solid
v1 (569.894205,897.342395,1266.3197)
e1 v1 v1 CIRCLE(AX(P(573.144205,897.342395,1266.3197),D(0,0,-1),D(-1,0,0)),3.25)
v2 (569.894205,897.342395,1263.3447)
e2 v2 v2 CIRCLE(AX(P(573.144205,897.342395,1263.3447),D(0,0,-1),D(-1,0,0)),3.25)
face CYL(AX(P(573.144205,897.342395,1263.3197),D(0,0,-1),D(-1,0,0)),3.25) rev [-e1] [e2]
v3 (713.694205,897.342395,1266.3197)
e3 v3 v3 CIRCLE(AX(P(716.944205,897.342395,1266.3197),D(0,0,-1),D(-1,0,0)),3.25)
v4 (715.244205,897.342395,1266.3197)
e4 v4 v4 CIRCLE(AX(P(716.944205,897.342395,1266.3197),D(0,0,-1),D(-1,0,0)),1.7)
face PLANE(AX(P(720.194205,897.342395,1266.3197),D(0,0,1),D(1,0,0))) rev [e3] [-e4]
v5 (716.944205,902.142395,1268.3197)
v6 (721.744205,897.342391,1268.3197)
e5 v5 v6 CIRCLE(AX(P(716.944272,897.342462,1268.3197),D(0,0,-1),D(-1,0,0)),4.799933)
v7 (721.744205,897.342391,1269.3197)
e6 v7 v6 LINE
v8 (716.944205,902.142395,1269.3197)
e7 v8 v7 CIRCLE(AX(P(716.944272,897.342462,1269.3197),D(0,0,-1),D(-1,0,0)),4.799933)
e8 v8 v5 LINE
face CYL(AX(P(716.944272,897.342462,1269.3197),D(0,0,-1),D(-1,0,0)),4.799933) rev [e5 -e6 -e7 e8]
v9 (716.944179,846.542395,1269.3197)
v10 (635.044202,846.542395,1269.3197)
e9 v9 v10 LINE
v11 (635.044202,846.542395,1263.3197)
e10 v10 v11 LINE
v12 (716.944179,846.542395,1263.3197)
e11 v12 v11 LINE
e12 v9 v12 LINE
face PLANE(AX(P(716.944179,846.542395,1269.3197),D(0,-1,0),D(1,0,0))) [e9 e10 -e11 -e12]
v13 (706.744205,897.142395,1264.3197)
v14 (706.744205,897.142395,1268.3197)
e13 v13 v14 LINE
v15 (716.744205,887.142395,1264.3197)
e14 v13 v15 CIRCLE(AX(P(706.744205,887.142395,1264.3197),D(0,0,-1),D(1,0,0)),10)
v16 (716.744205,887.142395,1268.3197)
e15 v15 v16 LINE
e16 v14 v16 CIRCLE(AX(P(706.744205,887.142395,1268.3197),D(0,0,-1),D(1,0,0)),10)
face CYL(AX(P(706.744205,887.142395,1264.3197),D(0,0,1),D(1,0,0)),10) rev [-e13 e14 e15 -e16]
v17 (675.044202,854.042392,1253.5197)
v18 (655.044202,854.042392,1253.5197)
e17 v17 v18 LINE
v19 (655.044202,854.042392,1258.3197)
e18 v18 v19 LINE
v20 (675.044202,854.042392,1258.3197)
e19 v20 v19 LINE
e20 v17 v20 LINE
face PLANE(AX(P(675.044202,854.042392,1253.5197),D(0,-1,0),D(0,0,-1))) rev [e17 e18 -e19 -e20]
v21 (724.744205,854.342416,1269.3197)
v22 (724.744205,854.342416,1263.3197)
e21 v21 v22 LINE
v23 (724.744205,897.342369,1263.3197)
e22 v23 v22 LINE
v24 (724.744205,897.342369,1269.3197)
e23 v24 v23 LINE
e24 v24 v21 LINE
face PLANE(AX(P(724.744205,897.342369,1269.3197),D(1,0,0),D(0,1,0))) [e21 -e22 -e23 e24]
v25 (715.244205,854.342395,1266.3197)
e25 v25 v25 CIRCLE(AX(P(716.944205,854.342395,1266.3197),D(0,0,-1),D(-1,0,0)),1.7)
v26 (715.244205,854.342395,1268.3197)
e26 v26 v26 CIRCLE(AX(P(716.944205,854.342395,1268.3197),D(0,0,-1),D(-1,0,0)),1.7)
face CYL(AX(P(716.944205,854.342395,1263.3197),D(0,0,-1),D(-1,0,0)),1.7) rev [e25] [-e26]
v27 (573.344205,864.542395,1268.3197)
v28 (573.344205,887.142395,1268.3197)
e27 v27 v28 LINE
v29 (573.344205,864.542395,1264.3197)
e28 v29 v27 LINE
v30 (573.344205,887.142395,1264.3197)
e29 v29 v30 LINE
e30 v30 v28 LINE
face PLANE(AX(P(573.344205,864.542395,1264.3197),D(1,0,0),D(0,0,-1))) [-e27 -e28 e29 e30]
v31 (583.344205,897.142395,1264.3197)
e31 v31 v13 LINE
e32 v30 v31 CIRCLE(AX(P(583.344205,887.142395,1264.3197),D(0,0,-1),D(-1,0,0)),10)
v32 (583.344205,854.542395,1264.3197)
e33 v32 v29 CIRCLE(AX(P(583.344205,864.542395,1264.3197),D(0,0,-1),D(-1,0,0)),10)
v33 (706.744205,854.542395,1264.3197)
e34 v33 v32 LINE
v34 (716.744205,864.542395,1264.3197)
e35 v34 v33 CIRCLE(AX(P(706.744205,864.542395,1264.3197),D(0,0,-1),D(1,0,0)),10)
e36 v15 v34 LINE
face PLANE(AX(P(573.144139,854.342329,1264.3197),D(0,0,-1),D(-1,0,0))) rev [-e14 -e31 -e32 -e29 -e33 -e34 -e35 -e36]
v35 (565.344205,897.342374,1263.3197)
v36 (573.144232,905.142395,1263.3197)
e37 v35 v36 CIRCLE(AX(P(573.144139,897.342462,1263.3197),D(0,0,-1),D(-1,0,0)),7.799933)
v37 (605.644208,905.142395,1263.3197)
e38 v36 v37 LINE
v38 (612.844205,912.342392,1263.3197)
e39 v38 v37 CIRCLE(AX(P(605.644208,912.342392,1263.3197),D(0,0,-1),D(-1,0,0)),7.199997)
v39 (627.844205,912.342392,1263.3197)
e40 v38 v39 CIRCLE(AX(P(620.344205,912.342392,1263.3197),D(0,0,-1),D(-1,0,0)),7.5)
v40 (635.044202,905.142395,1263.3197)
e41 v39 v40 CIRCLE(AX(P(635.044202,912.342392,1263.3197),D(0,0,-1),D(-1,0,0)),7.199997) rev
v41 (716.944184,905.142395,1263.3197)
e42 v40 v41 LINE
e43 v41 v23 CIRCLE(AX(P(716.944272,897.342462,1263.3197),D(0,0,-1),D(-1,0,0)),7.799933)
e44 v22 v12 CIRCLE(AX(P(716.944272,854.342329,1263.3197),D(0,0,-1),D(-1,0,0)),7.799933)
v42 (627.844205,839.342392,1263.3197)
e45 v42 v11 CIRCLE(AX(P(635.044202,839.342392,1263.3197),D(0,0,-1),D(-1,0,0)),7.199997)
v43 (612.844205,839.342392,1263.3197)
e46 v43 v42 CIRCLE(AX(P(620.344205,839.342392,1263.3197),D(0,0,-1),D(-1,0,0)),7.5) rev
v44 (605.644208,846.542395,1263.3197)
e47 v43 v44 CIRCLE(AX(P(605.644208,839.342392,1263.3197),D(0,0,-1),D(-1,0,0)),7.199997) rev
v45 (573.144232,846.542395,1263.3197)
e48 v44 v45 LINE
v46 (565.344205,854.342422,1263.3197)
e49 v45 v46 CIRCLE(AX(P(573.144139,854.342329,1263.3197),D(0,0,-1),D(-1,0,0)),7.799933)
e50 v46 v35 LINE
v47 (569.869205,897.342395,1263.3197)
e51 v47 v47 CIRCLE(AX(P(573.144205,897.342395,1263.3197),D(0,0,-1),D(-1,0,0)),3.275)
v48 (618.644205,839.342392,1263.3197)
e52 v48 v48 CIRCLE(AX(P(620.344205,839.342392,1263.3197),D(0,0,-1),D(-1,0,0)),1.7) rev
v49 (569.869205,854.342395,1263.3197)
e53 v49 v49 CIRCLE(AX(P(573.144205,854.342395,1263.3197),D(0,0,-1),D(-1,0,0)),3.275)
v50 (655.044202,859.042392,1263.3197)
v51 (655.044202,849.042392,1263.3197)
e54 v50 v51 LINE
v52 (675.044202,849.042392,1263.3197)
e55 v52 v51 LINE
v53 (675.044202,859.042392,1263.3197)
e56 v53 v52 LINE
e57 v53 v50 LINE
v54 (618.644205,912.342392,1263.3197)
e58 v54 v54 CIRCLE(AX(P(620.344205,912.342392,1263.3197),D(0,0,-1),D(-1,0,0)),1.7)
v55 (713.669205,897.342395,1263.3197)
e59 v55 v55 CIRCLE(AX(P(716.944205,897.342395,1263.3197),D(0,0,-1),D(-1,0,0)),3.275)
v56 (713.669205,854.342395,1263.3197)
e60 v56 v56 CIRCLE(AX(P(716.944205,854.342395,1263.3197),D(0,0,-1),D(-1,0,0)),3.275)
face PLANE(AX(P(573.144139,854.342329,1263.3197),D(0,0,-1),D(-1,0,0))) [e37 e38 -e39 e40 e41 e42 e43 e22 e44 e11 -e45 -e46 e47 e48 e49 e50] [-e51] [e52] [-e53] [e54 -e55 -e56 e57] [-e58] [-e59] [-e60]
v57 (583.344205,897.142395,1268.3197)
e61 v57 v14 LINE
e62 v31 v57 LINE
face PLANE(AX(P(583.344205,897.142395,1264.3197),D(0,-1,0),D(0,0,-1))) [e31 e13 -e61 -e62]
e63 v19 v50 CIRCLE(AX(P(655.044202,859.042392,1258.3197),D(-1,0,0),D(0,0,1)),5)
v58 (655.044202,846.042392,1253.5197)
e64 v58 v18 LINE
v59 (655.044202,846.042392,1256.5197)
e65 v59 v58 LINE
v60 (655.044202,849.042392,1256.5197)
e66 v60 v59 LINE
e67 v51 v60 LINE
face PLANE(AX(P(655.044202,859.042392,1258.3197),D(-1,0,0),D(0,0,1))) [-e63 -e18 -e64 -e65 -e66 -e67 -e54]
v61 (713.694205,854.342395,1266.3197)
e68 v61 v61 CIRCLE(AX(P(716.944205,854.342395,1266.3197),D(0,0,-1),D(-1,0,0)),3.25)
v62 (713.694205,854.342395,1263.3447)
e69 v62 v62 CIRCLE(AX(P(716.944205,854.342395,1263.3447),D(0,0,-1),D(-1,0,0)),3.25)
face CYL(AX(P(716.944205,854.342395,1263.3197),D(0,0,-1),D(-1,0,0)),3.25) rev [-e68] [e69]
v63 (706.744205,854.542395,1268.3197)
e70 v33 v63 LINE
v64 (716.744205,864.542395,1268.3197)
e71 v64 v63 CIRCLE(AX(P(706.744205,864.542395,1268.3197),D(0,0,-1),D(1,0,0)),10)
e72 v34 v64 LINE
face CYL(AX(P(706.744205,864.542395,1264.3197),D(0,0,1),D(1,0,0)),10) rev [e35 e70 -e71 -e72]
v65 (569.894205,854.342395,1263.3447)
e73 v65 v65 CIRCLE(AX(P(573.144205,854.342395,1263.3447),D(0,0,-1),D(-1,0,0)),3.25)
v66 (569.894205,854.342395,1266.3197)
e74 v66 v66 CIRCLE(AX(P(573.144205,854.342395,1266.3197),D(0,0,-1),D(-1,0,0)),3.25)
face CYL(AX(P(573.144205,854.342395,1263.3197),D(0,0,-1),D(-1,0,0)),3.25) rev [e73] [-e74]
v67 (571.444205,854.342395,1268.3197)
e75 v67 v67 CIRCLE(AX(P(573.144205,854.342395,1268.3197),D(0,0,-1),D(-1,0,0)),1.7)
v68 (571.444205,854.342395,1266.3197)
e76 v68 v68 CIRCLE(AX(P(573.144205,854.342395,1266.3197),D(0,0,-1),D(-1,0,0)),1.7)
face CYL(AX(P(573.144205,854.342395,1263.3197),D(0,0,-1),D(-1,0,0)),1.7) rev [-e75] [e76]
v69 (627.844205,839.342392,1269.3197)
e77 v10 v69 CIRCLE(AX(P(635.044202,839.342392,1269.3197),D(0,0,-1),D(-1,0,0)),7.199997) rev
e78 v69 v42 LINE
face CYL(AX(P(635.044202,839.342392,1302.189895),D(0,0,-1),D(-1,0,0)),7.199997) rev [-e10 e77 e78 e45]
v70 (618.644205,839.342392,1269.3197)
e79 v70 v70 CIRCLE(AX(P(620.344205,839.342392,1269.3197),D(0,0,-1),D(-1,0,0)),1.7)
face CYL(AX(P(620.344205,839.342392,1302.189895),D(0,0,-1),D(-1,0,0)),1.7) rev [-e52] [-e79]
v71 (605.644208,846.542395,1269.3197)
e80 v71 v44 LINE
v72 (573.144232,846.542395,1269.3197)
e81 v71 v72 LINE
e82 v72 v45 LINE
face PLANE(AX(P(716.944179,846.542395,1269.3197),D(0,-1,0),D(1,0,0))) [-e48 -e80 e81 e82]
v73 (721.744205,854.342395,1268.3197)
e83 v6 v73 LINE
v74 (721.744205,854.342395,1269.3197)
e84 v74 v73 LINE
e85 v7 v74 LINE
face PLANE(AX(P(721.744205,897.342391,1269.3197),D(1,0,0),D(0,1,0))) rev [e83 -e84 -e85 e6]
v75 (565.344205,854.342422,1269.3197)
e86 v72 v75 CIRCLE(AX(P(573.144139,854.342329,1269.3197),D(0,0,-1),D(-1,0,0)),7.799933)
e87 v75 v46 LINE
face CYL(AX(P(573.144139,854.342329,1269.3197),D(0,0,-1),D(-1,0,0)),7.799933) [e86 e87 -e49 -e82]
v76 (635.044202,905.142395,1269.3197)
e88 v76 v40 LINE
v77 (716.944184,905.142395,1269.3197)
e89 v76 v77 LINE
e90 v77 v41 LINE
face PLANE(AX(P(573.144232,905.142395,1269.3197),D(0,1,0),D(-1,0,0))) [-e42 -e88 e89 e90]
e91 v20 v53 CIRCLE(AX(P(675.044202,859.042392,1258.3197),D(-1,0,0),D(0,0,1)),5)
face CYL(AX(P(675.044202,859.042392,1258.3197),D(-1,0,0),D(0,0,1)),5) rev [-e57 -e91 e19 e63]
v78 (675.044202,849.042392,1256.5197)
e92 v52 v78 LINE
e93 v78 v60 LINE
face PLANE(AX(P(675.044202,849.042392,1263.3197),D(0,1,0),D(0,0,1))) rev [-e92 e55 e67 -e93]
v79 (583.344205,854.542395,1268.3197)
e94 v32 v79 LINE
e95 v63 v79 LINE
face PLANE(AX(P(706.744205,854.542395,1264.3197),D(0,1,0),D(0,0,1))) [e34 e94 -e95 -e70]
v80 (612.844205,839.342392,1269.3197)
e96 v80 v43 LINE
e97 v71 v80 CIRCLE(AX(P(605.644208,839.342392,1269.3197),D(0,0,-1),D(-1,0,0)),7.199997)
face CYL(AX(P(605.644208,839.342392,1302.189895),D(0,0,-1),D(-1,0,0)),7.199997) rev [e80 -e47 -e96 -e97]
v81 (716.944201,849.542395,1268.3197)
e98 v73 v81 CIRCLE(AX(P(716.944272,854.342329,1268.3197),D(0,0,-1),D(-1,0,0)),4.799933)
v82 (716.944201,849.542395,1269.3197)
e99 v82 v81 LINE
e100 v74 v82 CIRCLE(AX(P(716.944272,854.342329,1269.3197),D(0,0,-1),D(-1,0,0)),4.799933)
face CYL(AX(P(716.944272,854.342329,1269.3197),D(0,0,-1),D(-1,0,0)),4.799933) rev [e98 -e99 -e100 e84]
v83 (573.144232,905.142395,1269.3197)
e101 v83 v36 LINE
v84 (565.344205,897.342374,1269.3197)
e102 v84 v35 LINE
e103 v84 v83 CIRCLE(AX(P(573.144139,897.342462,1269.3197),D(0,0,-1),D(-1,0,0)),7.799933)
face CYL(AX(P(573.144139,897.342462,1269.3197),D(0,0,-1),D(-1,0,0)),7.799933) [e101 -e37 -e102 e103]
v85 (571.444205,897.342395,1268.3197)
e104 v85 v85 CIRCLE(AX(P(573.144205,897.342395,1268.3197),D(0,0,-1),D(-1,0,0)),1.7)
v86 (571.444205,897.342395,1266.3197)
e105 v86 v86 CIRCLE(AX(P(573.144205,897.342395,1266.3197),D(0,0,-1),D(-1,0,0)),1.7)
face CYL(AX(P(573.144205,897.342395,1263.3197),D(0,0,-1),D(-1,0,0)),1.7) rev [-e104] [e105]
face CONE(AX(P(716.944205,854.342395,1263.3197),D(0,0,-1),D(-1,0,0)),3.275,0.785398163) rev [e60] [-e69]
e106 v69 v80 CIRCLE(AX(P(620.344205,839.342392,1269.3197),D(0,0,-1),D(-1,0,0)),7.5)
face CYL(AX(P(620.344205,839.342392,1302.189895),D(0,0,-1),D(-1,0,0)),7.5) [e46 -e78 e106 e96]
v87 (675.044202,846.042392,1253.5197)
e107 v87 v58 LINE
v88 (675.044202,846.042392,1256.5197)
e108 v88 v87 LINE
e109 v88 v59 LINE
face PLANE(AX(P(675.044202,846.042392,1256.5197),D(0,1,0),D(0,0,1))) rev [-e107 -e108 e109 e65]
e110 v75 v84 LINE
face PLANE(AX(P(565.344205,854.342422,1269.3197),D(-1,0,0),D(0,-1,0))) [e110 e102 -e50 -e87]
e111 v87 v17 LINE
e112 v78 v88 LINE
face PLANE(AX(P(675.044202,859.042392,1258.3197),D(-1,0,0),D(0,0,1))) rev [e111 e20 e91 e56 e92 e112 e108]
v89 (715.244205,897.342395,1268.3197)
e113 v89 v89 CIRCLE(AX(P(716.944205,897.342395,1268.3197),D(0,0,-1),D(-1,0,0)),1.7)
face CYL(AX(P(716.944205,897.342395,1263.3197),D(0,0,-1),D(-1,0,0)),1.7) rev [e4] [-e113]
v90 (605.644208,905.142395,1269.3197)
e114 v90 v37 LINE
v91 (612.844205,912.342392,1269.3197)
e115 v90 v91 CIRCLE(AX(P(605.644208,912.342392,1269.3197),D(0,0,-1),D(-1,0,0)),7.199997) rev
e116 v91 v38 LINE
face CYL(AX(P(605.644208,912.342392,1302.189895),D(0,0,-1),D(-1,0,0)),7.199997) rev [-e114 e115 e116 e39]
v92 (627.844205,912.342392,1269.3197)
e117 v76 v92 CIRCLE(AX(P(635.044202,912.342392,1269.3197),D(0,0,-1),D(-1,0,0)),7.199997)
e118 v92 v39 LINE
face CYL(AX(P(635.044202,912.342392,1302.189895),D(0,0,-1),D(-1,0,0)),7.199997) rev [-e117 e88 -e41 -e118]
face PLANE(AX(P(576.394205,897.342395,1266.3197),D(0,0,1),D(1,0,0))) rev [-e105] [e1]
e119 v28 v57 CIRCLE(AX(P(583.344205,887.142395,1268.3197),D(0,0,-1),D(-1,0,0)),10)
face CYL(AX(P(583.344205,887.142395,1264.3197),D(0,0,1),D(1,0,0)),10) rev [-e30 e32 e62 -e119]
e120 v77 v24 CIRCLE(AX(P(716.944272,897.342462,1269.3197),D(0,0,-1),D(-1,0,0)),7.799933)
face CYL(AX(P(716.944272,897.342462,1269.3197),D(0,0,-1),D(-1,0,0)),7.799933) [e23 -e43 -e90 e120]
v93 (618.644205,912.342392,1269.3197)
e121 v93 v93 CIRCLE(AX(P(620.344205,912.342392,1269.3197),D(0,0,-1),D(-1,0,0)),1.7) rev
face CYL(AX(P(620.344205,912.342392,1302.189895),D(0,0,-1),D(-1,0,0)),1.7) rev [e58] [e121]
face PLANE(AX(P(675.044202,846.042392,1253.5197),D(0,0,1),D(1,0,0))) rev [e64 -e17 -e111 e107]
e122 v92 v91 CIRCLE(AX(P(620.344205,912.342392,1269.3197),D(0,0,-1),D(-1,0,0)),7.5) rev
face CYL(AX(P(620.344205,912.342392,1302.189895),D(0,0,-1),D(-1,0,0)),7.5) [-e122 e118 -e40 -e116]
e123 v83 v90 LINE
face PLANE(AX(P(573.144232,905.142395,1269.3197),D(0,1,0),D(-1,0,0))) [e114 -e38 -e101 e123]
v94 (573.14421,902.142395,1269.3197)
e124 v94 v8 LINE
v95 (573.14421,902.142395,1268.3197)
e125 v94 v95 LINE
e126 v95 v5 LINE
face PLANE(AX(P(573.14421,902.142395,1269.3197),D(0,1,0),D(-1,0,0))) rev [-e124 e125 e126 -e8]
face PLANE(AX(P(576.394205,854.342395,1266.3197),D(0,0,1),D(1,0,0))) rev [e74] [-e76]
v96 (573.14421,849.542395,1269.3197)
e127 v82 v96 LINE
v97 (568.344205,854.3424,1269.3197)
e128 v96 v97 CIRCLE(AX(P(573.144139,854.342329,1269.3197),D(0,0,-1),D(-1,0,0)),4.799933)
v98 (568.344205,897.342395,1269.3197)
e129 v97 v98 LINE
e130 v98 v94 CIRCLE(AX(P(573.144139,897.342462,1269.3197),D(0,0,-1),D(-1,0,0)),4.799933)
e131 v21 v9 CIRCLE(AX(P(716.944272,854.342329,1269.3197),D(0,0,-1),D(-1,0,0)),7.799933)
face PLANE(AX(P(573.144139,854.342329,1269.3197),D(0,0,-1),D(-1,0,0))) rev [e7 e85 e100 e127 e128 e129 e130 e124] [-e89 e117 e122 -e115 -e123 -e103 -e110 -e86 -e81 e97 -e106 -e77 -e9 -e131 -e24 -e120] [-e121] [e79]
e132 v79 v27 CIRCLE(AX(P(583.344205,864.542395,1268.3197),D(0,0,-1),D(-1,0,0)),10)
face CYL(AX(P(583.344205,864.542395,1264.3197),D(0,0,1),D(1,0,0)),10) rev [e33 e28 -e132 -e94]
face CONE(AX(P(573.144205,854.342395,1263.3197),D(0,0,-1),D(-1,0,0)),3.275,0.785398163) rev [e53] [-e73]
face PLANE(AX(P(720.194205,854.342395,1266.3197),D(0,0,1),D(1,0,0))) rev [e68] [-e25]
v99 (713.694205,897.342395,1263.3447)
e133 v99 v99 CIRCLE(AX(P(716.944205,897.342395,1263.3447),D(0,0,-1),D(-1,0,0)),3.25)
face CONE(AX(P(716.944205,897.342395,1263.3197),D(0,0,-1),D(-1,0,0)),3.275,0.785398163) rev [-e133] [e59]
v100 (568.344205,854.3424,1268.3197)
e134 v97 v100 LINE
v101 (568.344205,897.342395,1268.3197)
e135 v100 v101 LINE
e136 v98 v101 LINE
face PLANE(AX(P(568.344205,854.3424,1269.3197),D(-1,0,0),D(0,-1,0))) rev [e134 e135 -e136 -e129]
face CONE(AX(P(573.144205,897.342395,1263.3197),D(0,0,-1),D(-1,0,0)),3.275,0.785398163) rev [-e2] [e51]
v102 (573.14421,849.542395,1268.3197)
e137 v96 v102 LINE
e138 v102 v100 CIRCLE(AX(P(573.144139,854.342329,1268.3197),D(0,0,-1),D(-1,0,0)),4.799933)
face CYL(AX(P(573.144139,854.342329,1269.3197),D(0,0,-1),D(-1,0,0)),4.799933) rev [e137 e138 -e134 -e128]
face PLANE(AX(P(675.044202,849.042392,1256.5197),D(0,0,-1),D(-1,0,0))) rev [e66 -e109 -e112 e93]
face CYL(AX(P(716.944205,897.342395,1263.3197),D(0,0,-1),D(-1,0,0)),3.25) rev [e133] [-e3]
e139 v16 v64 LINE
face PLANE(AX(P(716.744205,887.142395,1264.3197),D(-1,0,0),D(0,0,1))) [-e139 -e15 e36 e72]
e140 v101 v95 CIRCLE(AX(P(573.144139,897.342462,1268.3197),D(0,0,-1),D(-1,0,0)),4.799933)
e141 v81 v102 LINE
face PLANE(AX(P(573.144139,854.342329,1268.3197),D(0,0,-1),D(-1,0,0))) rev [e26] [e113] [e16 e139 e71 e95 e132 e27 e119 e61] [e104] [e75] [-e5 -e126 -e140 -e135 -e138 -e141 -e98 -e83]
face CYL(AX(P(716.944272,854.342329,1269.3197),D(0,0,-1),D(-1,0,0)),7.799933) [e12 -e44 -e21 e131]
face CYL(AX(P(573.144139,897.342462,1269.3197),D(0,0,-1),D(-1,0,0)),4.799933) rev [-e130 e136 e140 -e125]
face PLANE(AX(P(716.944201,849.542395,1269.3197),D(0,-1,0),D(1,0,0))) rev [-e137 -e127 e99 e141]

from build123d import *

# Parameters (mm, degrees)
BOSS_EXTRUDE1_DEPTH           = 1
BOSS_EXTRUDE2_START           = 4
BOSS_EXTRUDE2_DEPTH           = 4
BOSS_EXTRUDE3_START           = 1
BOSS_EXTRUDE3_DEPTH           = 1
CBORE_FOR_M3_SHCS1_AT_2_COUNT = 2
CBORE_FOR_M3_SHCS1_AT_2_PITCH = 143.8
CBORE_FOR_M3_SHCS1_AT_3_COUNT = 2
CBORE_FOR_M3_SHCS1_AT_3_PITCH = 150.091438796
CBORE_FOR_M3_SHCS1_AT_4_COUNT = 2
CBORE_FOR_M3_SHCS1_AT_4_PITCH = 43
BOSS_EXTRUDE4_START           = -6
BOSS_EXTRUDE4_OUTLINE_R       = 1.7
BOSS_EXTRUDE4_DEPTH           = 6
BOSS_EXTRUDE5_DEPTH           = 20


# Read off the part's stored shape, not the designer's step: Boss-Extrude4
with BuildPart() as part:
    # Sketch1 → Boss-Extrude1 (new body)
    with BuildSketch(Plane(origin=(0, 0, 1268.319699828), x_dir=(-1, 0, 0), z_dir=(0, 0, -1))):
        with BuildLine():
            Line((-565.344205178, 854.342421724), (-565.344205178, 897.342374326))
            ThreePointArc((-565.344205178, 897.342374326), (-567.628754858, 902.85784955), (-573.144231788, 905.142395114))
            Line((-573.144231788, 905.142395114), (-716.944184389, 905.142395114))
            ThreePointArc((-716.944184389, 905.142395114), (-722.459659614, 902.857845434), (-724.744205178, 897.342368505))
            Line((-724.744205178, 897.342368505), (-724.744205178, 854.342415903))
            ThreePointArc((-724.744205178, 854.342415903), (-722.459655498, 848.826940679), (-716.944178568, 846.542395115))
            Line((-716.944178568, 846.542395115), (-573.144231788, 846.542395115))
            ThreePointArc((-573.144231788, 846.542395115), (-567.6287528, 848.826942737), (-565.344205178, 854.342421724))
        make_face()
        with BuildLine():
            Line((-568.344205178, 854.342399549), (-568.344205178, 897.342395114))
            ThreePointArc((-568.344205178, 897.342395114), (-569.750074712, 900.736528717), (-573.144209613, 902.142395114))
            Line((-573.144209613, 902.142395114), (-716.944205178, 902.142395114))
            ThreePointArc((-716.944205178, 902.142395114), (-720.33833878, 900.736525581), (-721.744205178, 897.342390679))
            Line((-721.744205178, 897.342390679), (-721.744205178, 854.342395114))
            ThreePointArc((-721.744205178, 854.342395114), (-720.338335644, 850.948261512), (-716.944200743, 849.542395115))
            Line((-716.944200743, 849.542395115), (-573.144209613, 849.542395115))
            ThreePointArc((-573.144209613, 849.542395115), (-569.750073144, 850.94826308), (-568.344205178, 854.342399549))
        make_face(mode=Mode.SUBTRACT)
    extrude(amount=-BOSS_EXTRUDE1_DEPTH)

    # Sketch2 → Boss-Extrude2 (add)
    with BuildSketch(Plane(origin=(0, 0, 1268.319699828), x_dir=(-1, 0, 0), z_dir=(0, 0, -1)).offset(BOSS_EXTRUDE2_START)):
        with BuildLine():
            Line((-565.344205178, 854.342421724), (-565.344205178, 897.342374326))
            ThreePointArc((-565.344205178, 897.342374326), (-567.628754858, 902.85784955), (-573.144231788, 905.142395114))
            Line((-573.144231788, 905.142395114), (-716.944184389, 905.142395114))
            ThreePointArc((-716.944184389, 905.142395114), (-722.459659614, 902.857845434), (-724.744205178, 897.342368505))
            Line((-724.744205178, 897.342368505), (-724.744205178, 854.342415903))
            ThreePointArc((-724.744205178, 854.342415903), (-722.459655498, 848.826940679), (-716.944178568, 846.542395115))
            Line((-716.944178568, 846.542395115), (-573.144231788, 846.542395115))
            ThreePointArc((-573.144231788, 846.542395115), (-567.6287528, 848.826942737), (-565.344205178, 854.342421724))
        make_face()
        with BuildLine():
            Line((-573.344205178, 864.542395115), (-573.344205178, 887.142395114))
            ThreePointArc((-573.344205178, 887.142395114), (-576.273137366, 894.213462926), (-583.344205178, 897.142395114))
            Line((-583.344205178, 897.142395114), (-706.744205178, 897.142395114))
            ThreePointArc((-706.744205178, 897.142395114), (-713.81527299, 894.213462926), (-716.744205178, 887.142395114))
            Line((-716.744205178, 887.142395114), (-716.744205178, 864.542395115))
            ThreePointArc((-716.744205178, 864.542395115), (-713.81527299, 857.471327303), (-706.744205178, 854.542395115))
            Line((-706.744205178, 854.542395115), (-583.344205178, 854.542395115))
            ThreePointArc((-583.344205178, 854.542395115), (-576.273137366, 857.471327303), (-573.344205178, 864.542395115))
        make_face(mode=Mode.SUBTRACT)
    extrude(amount=-BOSS_EXTRUDE2_DEPTH)

    # Sketch3 → Boss-Extrude3 (add)
    with BuildSketch(Plane(origin=(0, 0, 1264.319699828), x_dir=(-1, 0, 0), z_dir=(0, 0, -1)).offset(BOSS_EXTRUDE3_START)):
        with BuildLine():
            Line((-565.344205178, 854.342421724), (-565.344205178, 897.342374326))
            ThreePointArc((-565.344205178, 897.342374326), (-567.628754858, 902.85784955), (-573.144231788, 905.142395114))
            Line((-573.144231788, 905.142395114), (-716.944184389, 905.142395114))
            ThreePointArc((-716.944184389, 905.142395114), (-722.459659614, 902.857845434), (-724.744205178, 897.342368505))
            Line((-724.744205178, 897.342368505), (-724.744205178, 854.342415903))
            ThreePointArc((-724.744205178, 854.342415903), (-722.459655498, 848.826940679), (-716.944178568, 846.542395115))
            Line((-716.944178568, 846.542395115), (-573.144231788, 846.542395115))
            ThreePointArc((-573.144231788, 846.542395115), (-567.6287528, 848.826942737), (-565.344205178, 854.342421724))
        make_face()
    extrude(amount=-BOSS_EXTRUDE3_DEPTH)

    # Sketch5 → CBORE for M3 SHCS1 (revolve, cut)
    with BuildSketch(Plane(origin=(716.944205178, 897.342395114, 1263.319699828), x_dir=(0, 1, 0), z_dir=(1, 0, 0))):
        Polygon((0, 0), (0, 6), (1.7, 6), (1.7, 3), (3.25, 3), (3.25, 0.025), (3.275, 0), align=None)
    cbore_for_m3_shcs1 = revolve(axis=Axis((716.944205178, 897.342395114, 1256.969699828), (0, 0, 1)), mode=Mode.SUBTRACT)

    # CBORE for M3 SHCS1 at 2: CBORE for M3 SHCS1 ×2
    with Locations(*[(-i * CBORE_FOR_M3_SHCS1_AT_2_PITCH, 0, 0) for i in range(1, CBORE_FOR_M3_SHCS1_AT_2_COUNT)]):
        add(cbore_for_m3_shcs1, mode=Mode.SUBTRACT)

    # CBORE for M3 SHCS1 at 3: CBORE for M3 SHCS1 ×2
    with Locations(*[Vector(-0.958082627184226, -0.2864920234278285, 0) * (i * CBORE_FOR_M3_SHCS1_AT_3_PITCH) for i in range(1, CBORE_FOR_M3_SHCS1_AT_3_COUNT)]):
        add(cbore_for_m3_shcs1, mode=Mode.SUBTRACT)

    # CBORE for M3 SHCS1 at 4: CBORE for M3 SHCS1 ×2
    with Locations(*[(0, -i * CBORE_FOR_M3_SHCS1_AT_4_PITCH, 0) for i in range(1, CBORE_FOR_M3_SHCS1_AT_4_COUNT)]):
        add(cbore_for_m3_shcs1, mode=Mode.SUBTRACT)


with BuildPart() as boss_extrude4_tool:
    # Boss-Extrude4 outline → Boss-Extrude4 (new body)
    # profile 1 of 2: a face of its own
    with BuildSketch(Plane(origin=(0, 0, 1263.319699828), x_dir=(-1, 0, 0), z_dir=(0, 0, -1)).offset(BOSS_EXTRUDE4_START)):
        with BuildLine():
            ThreePointArc((-635.044202268, 846.542389294), (-629.953035501, 844.433558971), (-627.844205178, 839.342392204))
            ThreePointArc((-627.844205178, 839.342392204), (-620.344205178, 831.842392204), (-612.844205178, 839.342392204))
            ThreePointArc((-612.844205178, 839.342392204), (-610.735374855, 844.433558971), (-605.644208088, 846.542389294))
            Line((-605.644208088, 846.542389294), (-635.044202268, 846.542389294))
        make_face()
        with Locations((-620.344205178, 839.342392204)):
            Circle(BOSS_EXTRUDE4_OUTLINE_R, mode=Mode.SUBTRACT)
    # profile 2 of 2: a face of its own
    with BuildSketch(Plane(origin=(0, 0, 1263.319699828), x_dir=(-1, 0, 0), z_dir=(0, 0, -1)).offset(BOSS_EXTRUDE4_START)):
        with BuildLine():
            ThreePointArc((-605.644208088, 905.142395114), (-610.735374855, 907.251225437), (-612.844205178, 912.342392204))
            ThreePointArc((-612.844205178, 912.342392204), (-620.344205178, 919.842392204), (-627.844205178, 912.342392204))
            ThreePointArc((-627.844205178, 912.342392204), (-629.953035501, 907.251225437), (-635.044202268, 905.142395114))
            Line((-635.044202268, 905.142395114), (-605.644208088, 905.142395114))
        make_face()
        with Locations((-620.344205178, 912.342392204)):
            Circle(BOSS_EXTRUDE4_OUTLINE_R, mode=Mode.SUBTRACT)
    extrude(amount=BOSS_EXTRUDE4_DEPTH)


with BuildPart() as part_1:
    add(part.part)


with BuildPart() as part_2:
    # Boss-Extrude4: joined with boss_extrude4_tool
    add(part_1.part.fuse(boss_extrude4_tool.part, tol=0.00001))

    # Sketch7 → Boss-Extrude5 (add)
    with BuildSketch(Plane(origin=(655.044202268, 0, 0), x_dir=(0, 0, -1), z_dir=(1, 0, 0))):
        with BuildLine():
            Line((-1263.319699828, 849.042392204), (-1256.519699828, 849.042392204))
            Line((-1256.519699828, 849.042392204), (-1256.519699828, 846.042392204))
            Line((-1256.519699828, 846.042392204), (-1253.519699828, 846.042392204))
            Line((-1253.519699828, 846.042392204), (-1253.519699828, 854.042392204))
            Line((-1253.519699828, 854.042392204), (-1258.319699828, 854.042392204))
            ThreePointArc((-1258.319699828, 854.042392204), (-1261.855233734, 855.506858298), (-1263.319699828, 859.042392204))
            Line((-1263.319699828, 859.042392204), (-1263.319699828, 849.042392204))
        make_face()
    extrude(amount=BOSS_EXTRUDE5_DEPTH)


solid = part_2.part
